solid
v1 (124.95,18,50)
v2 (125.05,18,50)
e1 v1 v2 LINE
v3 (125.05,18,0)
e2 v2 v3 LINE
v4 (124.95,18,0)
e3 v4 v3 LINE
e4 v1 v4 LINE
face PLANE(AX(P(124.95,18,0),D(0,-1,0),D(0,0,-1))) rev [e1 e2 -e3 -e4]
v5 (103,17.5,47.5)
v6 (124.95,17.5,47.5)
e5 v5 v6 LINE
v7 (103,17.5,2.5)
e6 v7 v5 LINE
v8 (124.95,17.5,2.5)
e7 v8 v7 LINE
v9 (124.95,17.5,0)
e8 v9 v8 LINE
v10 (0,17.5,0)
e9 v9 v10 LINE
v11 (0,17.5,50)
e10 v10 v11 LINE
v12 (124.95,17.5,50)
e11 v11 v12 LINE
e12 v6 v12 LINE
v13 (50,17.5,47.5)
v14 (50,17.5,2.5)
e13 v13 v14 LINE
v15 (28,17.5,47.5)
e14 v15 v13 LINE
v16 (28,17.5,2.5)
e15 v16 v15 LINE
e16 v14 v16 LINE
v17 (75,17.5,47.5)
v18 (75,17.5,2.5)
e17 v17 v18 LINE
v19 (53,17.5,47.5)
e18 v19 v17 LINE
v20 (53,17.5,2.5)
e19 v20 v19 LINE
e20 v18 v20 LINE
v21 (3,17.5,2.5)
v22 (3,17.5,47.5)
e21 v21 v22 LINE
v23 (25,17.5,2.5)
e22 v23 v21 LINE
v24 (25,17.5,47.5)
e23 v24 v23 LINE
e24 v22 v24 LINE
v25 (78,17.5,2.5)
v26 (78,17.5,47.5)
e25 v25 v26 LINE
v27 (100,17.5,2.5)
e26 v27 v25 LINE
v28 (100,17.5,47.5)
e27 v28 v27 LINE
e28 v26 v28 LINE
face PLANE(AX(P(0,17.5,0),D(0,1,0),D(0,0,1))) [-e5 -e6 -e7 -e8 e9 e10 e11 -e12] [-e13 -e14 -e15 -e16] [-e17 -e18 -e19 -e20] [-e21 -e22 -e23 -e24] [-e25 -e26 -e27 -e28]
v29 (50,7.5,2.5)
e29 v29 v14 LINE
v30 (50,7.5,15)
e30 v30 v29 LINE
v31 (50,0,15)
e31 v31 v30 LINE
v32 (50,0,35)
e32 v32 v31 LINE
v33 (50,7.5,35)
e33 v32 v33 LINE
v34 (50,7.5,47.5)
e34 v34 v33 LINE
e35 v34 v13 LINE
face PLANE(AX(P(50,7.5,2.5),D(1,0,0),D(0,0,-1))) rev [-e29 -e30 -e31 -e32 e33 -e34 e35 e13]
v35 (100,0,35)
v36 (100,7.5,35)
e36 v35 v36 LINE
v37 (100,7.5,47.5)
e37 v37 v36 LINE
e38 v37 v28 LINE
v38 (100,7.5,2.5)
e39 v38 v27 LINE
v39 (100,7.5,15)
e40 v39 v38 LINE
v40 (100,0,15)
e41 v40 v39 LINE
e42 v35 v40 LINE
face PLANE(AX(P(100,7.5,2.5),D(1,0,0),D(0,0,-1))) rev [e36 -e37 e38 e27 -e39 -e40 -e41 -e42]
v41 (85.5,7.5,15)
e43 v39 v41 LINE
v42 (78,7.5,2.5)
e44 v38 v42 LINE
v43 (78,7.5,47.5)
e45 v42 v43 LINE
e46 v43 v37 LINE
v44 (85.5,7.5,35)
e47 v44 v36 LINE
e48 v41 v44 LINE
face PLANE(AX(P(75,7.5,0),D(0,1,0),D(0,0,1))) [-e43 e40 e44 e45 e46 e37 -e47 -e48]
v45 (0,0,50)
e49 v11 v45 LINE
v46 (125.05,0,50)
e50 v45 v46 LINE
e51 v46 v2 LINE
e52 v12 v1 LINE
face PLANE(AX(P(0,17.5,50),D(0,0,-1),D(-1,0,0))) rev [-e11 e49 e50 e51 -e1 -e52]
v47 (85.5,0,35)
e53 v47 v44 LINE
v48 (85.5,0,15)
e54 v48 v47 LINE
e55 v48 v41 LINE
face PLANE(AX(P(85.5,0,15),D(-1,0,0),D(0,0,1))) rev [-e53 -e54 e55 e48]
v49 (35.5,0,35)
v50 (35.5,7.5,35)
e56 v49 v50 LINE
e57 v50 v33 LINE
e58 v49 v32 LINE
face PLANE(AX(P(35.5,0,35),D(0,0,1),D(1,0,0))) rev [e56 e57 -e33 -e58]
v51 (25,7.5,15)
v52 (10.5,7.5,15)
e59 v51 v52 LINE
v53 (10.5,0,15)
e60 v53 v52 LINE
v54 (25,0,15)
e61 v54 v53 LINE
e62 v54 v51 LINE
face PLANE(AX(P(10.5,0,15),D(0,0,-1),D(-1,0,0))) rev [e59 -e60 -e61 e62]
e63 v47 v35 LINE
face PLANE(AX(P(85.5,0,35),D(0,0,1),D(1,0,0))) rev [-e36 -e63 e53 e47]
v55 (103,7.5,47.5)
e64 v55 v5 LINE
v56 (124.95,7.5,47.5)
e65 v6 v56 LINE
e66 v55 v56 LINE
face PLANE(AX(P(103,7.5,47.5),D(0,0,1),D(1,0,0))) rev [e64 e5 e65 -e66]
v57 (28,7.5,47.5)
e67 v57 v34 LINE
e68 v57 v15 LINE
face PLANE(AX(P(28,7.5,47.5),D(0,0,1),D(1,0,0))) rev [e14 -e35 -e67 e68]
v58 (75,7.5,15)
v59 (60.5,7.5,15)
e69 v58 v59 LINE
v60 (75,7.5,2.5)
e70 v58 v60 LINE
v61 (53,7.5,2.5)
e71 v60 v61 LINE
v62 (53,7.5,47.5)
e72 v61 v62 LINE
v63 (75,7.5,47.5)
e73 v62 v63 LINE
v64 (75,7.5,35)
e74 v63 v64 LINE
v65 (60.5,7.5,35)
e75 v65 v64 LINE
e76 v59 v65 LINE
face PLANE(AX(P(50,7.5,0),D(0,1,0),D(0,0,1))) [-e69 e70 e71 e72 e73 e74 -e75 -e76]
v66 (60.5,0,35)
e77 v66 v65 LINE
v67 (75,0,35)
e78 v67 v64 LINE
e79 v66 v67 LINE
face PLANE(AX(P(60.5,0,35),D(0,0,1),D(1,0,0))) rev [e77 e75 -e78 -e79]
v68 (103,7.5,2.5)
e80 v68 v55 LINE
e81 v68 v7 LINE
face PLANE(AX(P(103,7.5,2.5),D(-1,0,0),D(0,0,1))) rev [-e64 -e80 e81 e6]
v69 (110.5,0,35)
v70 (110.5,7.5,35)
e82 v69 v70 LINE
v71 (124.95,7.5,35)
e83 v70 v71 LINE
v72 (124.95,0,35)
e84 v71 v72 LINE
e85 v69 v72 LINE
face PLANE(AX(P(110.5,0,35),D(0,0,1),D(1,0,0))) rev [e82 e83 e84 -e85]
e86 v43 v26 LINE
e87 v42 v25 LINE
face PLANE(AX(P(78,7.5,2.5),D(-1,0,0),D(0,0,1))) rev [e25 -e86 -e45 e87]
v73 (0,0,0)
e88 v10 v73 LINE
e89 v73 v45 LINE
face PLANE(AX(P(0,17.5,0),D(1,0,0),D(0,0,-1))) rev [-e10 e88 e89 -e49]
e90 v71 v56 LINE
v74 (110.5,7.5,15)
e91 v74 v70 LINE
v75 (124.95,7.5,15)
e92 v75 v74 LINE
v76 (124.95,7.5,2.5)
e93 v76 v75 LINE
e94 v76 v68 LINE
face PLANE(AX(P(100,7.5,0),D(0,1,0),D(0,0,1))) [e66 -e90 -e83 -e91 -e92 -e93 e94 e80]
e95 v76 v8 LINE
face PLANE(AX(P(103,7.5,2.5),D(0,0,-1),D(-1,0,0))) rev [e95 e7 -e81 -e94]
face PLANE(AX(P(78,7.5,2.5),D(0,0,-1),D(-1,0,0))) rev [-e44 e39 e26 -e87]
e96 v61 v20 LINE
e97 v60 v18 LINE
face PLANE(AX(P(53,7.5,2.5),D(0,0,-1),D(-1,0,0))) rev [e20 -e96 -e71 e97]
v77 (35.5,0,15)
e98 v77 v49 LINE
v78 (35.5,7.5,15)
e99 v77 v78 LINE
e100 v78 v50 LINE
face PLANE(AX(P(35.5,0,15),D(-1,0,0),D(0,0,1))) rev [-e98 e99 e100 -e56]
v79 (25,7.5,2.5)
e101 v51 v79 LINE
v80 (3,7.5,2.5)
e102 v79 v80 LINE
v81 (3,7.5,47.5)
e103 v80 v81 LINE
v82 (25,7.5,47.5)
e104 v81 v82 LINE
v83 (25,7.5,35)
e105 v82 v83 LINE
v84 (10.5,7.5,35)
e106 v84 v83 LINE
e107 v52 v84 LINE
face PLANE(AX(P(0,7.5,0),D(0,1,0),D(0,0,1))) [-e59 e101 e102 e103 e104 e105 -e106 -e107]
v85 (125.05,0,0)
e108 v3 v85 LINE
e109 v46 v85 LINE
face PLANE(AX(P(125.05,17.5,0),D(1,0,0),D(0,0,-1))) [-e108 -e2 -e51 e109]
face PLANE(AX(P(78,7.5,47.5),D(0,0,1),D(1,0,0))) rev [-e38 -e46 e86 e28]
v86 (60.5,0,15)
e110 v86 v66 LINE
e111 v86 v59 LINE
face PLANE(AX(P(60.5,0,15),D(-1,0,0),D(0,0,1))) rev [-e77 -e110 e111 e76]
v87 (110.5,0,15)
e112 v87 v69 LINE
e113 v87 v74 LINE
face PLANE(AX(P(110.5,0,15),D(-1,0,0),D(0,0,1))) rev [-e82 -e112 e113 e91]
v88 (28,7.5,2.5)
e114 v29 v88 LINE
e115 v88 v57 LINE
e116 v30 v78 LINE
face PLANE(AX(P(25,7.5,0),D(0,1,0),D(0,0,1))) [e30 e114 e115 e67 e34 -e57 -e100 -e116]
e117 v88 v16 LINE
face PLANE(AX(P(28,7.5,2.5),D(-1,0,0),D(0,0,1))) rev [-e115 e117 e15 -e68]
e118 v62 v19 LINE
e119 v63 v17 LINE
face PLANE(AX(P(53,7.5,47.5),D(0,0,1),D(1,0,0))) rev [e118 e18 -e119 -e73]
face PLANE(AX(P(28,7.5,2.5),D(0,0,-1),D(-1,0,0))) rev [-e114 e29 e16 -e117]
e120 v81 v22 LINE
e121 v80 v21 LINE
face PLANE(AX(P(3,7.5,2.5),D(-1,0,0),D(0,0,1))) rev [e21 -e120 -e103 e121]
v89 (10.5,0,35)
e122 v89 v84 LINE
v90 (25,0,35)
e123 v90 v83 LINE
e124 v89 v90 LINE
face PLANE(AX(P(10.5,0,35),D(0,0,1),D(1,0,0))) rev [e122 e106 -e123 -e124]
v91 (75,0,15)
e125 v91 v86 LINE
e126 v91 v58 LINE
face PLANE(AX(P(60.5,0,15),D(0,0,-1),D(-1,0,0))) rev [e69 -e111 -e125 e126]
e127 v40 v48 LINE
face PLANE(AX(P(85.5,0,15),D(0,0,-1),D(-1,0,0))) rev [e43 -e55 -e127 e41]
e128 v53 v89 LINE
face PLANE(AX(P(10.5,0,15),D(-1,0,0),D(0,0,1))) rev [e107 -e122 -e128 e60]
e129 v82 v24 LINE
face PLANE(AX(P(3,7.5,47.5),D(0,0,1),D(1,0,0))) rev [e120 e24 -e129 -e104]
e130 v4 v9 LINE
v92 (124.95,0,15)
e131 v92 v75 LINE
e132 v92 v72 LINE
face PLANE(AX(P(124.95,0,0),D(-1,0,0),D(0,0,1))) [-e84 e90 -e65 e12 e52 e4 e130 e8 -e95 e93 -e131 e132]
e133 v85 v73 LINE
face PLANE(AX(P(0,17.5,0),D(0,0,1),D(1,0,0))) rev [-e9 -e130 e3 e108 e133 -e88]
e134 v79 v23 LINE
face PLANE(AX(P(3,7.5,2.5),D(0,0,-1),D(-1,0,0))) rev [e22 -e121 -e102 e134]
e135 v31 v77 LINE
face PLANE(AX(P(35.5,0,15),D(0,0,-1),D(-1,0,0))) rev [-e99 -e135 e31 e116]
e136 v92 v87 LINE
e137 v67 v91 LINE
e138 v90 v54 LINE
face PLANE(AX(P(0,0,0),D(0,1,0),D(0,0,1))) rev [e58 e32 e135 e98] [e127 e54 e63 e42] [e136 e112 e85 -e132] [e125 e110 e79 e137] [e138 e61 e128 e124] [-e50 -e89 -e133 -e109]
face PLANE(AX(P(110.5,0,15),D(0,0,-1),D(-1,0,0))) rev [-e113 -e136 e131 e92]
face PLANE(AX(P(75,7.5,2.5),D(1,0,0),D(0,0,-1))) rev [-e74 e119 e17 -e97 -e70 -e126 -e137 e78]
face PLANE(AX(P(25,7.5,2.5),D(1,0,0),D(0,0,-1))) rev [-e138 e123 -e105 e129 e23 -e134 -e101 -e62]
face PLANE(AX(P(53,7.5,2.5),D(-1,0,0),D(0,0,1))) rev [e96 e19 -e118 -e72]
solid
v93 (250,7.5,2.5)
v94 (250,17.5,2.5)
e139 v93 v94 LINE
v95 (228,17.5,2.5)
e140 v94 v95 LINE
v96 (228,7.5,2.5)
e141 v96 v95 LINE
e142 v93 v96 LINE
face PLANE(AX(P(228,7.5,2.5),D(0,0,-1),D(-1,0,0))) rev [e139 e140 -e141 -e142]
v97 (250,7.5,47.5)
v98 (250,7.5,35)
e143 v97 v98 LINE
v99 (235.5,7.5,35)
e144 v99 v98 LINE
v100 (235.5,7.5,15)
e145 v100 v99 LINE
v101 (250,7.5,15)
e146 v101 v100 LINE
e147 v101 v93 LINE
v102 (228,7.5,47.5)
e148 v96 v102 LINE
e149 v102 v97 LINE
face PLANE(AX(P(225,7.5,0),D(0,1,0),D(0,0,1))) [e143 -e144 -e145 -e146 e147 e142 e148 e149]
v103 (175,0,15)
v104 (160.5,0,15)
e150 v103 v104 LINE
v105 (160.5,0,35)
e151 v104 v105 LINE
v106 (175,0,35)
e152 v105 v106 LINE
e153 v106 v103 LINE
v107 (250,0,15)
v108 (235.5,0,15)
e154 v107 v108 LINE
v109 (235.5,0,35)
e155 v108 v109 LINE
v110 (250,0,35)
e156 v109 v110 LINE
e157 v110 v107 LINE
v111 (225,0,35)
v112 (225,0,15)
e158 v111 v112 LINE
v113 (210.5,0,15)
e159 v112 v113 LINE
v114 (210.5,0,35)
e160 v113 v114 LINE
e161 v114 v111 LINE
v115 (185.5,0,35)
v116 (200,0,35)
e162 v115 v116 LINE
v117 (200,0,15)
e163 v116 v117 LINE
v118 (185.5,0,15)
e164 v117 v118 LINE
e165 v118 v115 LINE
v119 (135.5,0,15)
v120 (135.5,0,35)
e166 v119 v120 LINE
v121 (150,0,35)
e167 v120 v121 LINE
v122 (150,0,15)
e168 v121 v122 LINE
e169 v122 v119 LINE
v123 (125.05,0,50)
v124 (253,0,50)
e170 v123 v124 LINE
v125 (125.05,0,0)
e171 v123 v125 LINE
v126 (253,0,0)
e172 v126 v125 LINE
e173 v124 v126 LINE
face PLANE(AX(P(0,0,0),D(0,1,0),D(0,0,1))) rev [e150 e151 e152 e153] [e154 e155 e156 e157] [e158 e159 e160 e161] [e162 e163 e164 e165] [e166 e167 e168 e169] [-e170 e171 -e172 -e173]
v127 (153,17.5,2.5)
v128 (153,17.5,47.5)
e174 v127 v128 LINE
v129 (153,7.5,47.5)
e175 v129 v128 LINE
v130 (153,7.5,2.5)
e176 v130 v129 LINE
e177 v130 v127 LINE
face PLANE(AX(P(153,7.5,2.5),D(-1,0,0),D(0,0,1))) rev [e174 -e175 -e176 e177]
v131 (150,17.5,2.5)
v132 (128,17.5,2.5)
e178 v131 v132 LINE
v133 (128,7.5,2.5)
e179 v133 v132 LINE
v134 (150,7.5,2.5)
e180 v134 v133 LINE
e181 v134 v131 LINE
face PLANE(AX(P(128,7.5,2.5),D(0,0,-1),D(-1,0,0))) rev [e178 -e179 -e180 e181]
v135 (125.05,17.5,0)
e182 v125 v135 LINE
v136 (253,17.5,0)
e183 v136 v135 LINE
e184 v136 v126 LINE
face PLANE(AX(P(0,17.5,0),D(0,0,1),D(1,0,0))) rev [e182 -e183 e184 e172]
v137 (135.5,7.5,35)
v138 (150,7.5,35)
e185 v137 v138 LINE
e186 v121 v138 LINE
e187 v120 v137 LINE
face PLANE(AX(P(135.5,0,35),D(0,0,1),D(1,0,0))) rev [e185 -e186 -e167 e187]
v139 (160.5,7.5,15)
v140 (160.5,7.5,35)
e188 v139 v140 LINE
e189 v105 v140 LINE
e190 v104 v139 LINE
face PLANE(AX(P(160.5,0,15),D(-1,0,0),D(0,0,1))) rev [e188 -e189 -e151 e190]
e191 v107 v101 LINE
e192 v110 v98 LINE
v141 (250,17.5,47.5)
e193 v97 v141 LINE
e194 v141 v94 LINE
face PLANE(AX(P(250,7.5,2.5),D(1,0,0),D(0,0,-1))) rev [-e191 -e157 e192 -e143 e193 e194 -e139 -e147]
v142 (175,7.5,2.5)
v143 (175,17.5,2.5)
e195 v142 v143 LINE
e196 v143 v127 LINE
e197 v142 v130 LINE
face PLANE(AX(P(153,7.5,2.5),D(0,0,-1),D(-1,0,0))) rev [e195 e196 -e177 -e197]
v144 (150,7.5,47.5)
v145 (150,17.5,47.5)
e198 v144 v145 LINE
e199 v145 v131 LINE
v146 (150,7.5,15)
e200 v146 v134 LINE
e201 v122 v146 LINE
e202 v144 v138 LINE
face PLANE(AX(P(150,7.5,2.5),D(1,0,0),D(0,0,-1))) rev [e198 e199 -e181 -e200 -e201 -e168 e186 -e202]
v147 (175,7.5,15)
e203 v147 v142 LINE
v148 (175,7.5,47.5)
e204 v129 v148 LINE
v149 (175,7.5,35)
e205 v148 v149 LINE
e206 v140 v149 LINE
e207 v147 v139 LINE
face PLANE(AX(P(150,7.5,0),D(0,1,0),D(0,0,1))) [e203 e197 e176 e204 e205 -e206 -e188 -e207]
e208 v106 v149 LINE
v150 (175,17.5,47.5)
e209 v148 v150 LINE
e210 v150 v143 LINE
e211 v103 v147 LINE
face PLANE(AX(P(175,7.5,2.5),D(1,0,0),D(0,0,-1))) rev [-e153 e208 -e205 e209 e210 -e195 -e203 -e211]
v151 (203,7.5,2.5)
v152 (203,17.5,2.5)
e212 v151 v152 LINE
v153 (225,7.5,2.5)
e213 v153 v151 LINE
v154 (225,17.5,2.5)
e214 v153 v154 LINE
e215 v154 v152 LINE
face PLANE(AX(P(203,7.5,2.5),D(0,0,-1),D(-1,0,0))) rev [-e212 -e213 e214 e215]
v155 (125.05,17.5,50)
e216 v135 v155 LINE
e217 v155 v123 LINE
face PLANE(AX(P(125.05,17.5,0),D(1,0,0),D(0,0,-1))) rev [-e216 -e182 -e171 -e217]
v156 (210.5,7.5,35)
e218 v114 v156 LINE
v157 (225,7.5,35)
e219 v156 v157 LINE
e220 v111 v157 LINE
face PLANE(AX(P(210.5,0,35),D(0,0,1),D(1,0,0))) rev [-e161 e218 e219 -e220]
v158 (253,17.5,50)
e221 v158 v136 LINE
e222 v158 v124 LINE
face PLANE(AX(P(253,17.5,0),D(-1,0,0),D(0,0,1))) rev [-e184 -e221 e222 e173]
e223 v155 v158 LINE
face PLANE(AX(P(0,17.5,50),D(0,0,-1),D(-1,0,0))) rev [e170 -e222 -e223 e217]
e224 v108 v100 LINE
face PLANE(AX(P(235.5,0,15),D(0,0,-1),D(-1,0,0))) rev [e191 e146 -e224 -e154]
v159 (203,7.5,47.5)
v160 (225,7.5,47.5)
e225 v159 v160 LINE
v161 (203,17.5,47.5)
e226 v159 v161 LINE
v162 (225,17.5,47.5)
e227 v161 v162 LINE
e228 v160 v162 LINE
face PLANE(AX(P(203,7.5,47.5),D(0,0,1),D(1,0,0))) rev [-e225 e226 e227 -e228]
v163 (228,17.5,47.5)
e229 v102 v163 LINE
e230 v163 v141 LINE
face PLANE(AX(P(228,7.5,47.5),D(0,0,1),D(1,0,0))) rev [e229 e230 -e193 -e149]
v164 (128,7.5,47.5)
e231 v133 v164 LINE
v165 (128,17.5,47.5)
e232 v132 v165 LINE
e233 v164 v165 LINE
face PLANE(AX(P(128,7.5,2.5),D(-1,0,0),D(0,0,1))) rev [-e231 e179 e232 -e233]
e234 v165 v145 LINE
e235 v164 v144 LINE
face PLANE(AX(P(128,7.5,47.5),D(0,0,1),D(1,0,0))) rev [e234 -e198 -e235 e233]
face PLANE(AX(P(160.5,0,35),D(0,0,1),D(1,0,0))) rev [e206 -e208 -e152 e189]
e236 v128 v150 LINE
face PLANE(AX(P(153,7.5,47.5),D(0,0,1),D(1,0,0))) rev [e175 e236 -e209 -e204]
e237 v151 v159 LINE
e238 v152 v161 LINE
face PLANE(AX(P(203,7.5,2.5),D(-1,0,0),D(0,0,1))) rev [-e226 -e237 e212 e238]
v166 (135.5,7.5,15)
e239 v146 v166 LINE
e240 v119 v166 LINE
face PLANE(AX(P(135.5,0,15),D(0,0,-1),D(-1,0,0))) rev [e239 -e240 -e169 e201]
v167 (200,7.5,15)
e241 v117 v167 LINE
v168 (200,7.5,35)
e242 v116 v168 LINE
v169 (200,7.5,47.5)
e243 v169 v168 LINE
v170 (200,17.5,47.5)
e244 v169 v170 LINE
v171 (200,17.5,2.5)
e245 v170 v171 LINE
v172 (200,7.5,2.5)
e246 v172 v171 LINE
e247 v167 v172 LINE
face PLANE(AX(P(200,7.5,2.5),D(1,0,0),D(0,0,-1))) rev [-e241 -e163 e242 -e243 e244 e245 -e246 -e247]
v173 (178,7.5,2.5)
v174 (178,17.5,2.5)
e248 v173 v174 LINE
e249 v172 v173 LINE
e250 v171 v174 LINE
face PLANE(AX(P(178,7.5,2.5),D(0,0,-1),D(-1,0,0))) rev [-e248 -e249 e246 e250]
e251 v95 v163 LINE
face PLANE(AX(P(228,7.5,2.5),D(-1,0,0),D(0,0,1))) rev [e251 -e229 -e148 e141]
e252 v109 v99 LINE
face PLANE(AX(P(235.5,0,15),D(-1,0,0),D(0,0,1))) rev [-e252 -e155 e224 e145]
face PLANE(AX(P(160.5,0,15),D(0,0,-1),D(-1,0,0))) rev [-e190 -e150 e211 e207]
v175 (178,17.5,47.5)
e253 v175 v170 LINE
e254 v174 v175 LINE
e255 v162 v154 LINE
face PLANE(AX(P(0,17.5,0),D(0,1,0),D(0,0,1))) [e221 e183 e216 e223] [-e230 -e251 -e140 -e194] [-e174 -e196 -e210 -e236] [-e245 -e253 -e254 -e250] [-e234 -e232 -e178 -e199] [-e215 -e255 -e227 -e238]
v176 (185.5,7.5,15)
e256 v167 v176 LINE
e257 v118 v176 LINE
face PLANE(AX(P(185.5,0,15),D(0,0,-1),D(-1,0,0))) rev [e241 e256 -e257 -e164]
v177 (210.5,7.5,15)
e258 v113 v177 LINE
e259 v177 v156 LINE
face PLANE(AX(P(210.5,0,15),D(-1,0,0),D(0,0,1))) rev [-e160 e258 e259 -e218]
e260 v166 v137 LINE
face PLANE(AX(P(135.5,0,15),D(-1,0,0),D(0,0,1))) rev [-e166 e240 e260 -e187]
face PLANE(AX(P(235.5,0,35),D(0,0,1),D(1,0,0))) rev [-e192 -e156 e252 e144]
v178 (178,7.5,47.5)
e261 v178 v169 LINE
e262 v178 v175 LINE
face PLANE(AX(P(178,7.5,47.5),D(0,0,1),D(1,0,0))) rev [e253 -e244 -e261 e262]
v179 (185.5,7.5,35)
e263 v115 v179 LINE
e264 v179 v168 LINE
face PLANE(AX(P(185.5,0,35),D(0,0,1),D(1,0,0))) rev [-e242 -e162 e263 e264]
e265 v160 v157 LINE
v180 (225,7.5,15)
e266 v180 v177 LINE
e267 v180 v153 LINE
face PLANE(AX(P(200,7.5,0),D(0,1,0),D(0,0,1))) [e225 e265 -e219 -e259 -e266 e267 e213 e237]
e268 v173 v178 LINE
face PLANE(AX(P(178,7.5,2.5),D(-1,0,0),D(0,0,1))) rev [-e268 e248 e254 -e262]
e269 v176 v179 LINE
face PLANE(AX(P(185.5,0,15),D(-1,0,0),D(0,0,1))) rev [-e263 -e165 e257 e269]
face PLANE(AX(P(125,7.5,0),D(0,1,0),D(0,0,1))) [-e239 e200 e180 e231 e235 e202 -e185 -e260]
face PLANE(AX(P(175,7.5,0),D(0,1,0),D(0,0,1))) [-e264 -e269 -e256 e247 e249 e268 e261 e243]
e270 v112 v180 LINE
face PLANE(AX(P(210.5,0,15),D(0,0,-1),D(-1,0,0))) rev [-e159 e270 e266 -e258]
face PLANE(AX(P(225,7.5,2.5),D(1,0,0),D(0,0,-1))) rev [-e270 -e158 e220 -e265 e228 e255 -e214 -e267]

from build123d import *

# Parameters (mm, degrees)
SKETCH1_W           = 253
SKETCH1_H           = 50
BOSS_EXTRUDE1_DEPTH = 17.5
SKETCH2_W           = 22
SKETCH2_H           = 45
CUT_EXTRUDE1_DEPTH  = 10
SKETCH3_W           = 14.5
SKETCH3_H           = 20
CUT_EXTRUDE2_DEPTH  = 17.5
LPATTERN1_COUNT     = 10
LPATTERN1_PITCH     = 25
SKETCH4_W           = 50
SKETCH4_H           = 18
BOSS_EXTRUDE2_DEPTH = 0.05


with BuildPart() as part:
    # Sketch1 → Boss-Extrude1 (new body)
    with BuildSketch(Plane(origin=(0, 0, 0), x_dir=(1, 0, 0), z_dir=(0, 1, 0))):
        with Locations((126.5, -25)):
            Rectangle(SKETCH1_W, SKETCH1_H)
    extrude(amount=BOSS_EXTRUDE1_DEPTH)

    # Sketch2 → Cut-Extrude1 (cut)
    with BuildSketch(Plane(origin=(0, 17.5, 0), x_dir=(1, 0, 0), z_dir=(0, 1, 0))):
        with Locations((14, -25)):
            Rectangle(SKETCH2_W, SKETCH2_H)
    cut_extrude1 = extrude(amount=-CUT_EXTRUDE1_DEPTH, mode=Mode.SUBTRACT)

    # Sketch3 → Cut-Extrude2 (cut)
    with BuildSketch(Plane(origin=(0, 17.5, 0), x_dir=(1, 0, 0), z_dir=(0, 1, 0))):
        with Locations((17.75, -25)):
            Rectangle(SKETCH3_W, SKETCH3_H)
    cut_extrude2 = extrude(amount=-CUT_EXTRUDE2_DEPTH, mode=Mode.SUBTRACT)

    # LPattern1: Cut-Extrude1, Cut-Extrude2 ×10
    with Locations(*[(i * LPATTERN1_PITCH, 0, 0) for i in range(1, LPATTERN1_COUNT)]):
        add(cut_extrude1, mode=Mode.SUBTRACT)
        add(cut_extrude2, mode=Mode.SUBTRACT)

    # Sketch4 → Boss-Extrude2 (add, symmetric)
    with BuildSketch(Plane.ZY.offset(-125)):
        with Locations((25, 9)):
            Rectangle(SKETCH4_W, SKETCH4_H)
    extrude(amount=BOSS_EXTRUDE2_DEPTH, both=True)


with BuildPart() as body_2:
    # Split1: the piece on the far side of the plane
    add(part.part)
    split(bisect_by=Plane(origin=(125.05, 0, 0), x_dir=(0, 0, -1), z_dir=(-1, 0, 0)), keep=Keep.BOTTOM)


with BuildPart() as part_1:
    add(part.part)

    # Split1
    split(bisect_by=Plane(origin=(125.05, 0, 0), x_dir=(0, 0, -1), z_dir=(-1, 0, 0)), keep=Keep.TOP)


solid = Compound([body_2.part, part_1.part])
